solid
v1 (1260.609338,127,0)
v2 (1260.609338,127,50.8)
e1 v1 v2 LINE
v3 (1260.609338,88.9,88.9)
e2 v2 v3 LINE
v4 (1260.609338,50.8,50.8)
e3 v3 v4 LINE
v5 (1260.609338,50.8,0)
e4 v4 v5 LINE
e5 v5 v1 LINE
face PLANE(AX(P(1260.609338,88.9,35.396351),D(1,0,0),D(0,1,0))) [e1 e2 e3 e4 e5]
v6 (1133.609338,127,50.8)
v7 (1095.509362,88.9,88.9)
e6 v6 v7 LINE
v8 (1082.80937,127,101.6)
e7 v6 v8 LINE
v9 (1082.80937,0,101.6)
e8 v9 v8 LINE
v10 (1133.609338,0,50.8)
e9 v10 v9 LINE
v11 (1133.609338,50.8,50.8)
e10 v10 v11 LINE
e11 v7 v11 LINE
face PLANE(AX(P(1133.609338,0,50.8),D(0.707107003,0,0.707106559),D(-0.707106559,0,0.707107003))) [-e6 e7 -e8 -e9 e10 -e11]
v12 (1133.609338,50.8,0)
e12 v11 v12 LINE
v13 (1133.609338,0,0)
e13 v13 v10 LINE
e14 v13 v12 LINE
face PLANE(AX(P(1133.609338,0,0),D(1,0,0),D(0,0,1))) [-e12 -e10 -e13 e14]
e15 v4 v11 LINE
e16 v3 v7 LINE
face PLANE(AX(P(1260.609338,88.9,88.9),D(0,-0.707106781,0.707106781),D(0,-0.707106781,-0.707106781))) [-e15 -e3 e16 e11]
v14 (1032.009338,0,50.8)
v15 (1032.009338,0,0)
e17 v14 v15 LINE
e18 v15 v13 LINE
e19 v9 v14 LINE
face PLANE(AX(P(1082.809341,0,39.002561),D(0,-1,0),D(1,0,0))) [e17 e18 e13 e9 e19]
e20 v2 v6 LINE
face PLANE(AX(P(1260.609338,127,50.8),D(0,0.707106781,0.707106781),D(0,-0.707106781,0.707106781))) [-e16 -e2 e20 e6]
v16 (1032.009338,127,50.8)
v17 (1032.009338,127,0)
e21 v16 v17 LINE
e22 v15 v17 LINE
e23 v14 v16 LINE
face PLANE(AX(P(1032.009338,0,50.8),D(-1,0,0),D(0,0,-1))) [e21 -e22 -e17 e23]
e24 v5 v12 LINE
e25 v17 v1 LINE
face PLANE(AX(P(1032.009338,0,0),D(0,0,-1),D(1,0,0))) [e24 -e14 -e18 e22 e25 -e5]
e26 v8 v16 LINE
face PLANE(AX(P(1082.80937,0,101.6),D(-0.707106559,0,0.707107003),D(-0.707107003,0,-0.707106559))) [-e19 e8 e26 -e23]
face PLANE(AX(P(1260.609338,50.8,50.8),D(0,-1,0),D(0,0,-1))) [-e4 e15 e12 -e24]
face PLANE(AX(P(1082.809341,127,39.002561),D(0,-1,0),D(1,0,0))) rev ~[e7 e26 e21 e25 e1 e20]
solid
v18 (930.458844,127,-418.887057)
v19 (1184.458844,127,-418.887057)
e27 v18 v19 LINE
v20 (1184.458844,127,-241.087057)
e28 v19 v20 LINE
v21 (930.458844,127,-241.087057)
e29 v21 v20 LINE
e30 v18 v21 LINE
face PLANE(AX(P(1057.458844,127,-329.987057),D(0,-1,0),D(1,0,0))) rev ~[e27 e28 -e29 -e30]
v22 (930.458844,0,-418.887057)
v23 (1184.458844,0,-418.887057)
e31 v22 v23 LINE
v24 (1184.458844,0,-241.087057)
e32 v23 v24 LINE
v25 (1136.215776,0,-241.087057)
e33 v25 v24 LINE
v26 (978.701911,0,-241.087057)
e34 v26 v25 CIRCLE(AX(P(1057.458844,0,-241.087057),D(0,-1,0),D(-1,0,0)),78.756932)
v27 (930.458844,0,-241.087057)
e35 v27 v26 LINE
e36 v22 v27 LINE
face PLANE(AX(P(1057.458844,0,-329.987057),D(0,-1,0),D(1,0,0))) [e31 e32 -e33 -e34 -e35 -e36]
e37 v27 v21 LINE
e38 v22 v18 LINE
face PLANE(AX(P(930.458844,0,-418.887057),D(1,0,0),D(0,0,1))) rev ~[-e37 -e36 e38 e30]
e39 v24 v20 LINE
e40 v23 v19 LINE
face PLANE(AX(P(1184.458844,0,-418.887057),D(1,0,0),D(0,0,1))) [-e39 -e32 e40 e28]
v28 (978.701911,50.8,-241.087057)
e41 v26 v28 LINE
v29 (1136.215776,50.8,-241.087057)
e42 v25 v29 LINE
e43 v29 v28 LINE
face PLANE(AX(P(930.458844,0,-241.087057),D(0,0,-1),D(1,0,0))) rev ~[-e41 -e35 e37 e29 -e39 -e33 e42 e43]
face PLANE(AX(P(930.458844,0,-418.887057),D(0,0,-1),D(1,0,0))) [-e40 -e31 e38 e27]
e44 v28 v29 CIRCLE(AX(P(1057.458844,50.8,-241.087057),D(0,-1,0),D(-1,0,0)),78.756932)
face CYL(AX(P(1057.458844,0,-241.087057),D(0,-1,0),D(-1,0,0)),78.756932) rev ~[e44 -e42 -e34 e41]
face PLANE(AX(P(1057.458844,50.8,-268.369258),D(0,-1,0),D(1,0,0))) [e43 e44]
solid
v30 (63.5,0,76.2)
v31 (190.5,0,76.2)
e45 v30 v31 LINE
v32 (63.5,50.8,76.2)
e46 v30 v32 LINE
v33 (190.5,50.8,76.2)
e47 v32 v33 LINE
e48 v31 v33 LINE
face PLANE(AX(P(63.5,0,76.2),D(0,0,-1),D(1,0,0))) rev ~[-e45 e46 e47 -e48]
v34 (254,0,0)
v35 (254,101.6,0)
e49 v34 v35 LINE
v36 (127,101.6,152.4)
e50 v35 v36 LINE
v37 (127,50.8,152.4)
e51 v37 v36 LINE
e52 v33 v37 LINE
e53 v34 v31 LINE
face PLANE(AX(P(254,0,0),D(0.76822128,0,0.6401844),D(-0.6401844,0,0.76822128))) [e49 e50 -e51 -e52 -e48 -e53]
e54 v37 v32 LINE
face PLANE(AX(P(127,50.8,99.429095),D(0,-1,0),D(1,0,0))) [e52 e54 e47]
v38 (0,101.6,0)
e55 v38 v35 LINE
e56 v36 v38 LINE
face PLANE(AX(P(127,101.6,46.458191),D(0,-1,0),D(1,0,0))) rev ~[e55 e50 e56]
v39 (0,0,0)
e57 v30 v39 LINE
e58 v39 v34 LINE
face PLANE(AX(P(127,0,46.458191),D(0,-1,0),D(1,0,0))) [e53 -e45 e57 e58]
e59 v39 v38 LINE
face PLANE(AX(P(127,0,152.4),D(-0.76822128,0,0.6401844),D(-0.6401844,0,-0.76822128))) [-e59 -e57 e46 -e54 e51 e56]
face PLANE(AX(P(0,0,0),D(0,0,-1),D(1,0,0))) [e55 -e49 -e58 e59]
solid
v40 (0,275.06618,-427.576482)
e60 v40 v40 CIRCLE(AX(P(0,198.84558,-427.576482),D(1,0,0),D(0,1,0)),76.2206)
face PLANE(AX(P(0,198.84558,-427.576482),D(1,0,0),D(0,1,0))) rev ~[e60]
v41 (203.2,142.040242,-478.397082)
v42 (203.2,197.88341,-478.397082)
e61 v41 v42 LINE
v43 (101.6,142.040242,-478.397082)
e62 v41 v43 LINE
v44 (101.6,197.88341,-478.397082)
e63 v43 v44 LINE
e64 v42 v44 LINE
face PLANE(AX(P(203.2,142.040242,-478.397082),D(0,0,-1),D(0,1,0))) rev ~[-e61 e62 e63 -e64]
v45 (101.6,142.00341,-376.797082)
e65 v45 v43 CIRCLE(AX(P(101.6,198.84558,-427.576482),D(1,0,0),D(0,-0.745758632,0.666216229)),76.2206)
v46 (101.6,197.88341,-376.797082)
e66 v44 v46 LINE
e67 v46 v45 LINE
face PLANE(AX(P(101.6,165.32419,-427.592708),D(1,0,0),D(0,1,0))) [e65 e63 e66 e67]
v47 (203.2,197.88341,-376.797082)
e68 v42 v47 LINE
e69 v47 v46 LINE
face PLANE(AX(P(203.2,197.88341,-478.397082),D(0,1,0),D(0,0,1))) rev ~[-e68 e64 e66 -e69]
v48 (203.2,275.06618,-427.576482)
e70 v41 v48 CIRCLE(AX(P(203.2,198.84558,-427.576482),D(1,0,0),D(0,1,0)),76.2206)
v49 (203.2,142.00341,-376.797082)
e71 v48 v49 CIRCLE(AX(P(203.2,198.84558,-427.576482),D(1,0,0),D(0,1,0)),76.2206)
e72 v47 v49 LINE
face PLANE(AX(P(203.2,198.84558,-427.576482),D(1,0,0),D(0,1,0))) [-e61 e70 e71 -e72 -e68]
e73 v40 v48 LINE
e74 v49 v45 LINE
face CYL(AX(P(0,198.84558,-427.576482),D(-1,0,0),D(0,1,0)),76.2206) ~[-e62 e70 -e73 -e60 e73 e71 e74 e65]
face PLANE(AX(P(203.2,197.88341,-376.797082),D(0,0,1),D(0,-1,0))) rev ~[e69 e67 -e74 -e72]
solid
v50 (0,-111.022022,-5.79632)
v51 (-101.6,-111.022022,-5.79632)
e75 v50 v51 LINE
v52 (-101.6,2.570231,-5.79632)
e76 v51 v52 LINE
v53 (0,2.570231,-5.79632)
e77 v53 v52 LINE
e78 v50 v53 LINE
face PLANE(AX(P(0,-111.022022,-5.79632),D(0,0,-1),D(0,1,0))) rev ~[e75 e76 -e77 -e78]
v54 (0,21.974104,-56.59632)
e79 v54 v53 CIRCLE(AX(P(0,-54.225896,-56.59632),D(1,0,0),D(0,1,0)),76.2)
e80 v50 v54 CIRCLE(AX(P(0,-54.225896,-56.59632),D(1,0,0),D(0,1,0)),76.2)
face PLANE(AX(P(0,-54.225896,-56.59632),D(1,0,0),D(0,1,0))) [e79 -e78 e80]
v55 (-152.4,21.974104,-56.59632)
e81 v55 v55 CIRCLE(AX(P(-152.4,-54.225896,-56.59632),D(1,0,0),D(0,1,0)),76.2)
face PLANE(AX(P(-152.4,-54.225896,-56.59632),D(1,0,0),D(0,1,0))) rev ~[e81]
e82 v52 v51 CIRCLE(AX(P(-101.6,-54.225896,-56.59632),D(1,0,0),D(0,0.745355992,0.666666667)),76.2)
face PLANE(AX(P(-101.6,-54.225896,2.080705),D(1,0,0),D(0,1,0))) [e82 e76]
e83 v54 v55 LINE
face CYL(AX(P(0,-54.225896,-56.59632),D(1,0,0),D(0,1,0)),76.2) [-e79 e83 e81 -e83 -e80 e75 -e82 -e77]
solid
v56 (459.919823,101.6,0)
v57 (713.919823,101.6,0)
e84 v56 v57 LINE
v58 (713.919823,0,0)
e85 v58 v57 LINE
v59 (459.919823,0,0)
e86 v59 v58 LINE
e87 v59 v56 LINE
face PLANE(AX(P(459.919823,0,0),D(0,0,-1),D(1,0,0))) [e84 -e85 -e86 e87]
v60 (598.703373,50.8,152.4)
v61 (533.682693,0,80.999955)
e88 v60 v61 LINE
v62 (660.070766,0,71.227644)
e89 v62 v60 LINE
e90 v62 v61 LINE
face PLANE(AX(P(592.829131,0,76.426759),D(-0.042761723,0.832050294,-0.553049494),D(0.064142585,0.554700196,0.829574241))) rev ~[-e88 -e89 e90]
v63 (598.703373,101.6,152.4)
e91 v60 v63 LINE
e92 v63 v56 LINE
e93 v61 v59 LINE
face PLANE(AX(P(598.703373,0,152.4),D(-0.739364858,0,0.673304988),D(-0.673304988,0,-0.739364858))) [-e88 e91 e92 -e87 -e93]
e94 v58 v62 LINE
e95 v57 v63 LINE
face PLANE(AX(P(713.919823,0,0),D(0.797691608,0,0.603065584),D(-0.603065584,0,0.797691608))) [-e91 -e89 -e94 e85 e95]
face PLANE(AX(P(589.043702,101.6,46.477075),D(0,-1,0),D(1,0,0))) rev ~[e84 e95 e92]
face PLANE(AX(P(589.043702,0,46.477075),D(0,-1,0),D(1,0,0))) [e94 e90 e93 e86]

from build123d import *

# Parameters (mm, degrees)
F1_DEPTH  = 101.6
F3_DEPTH  = 50.8
F5_DEPTH  = 101.6
F9_DEPTH  = 76.2
F11_DEPTH = 127
F15_R     = 76.2
F16_DEPTH = 152.4
F18_DEPTH = 101.6
F19_R     = 76.2205995961
F20_DEPTH = 203.2
F22_DEPTH = 101.6
F23_W     = 254
F23_H     = 177.8
F24_DEPTH = 127
F26_DEPTH = 50.8


with BuildPart() as f1:
    # F0 (on Front) → F1 (new body)
    with BuildSketch(Plane.XZ):
        Polygon((127, 152.4), (0, 0), (254, 0), align=None)
    extrude(amount=-F1_DEPTH)

    # F2 (on face) → F3 (cut)
    with BuildSketch(Plane.XZ):
        Polygon((127, 152.4), (63.5, 76.2), (190.5, 76.2), align=None)
    extrude(amount=-F3_DEPTH, mode=Mode.SUBTRACT)


with BuildPart() as f5:
    # F4 (on Front) → F5 (new body)
    with BuildSketch(Plane.XZ):
        Polygon((598.7033731911, 152.4), (459.9198227574, 0), (713.9198227574, 0), align=None)
    extrude(amount=-F5_DEPTH)

    # F8 (on 3pt) → F9 (cut, symmetric)
    with BuildSketch(Plane(origin=(583.4318544266, 0, -45.1108837356), x_dir=(0, 1, 0), z_dir=(0.9970241541, 0, -0.0770897927))):
        Polygon((50.8, 198.100399998), (0, 198.100399998), (0, 121.900399998), align=None)
    extrude(amount=F9_DEPTH, both=True, mode=Mode.SUBTRACT)


with BuildPart() as f11:
    # F10 (on Front) → F11 (new body)
    with BuildSketch(Plane.XZ):
        Polygon((1032.0093378178, 50.8), (1032.0093378178, 0), (1133.6093378178, 0), (1133.6093378178, 50.8), (1082.8093697124, 101.6), align=None)
    extrude(amount=-F11_DEPTH)

    # F13 (on offset) → F14 (join, up to the next surface of F11)
    with BuildSketch(Plane.YZ.offset(1260.6093378178)):
        Polygon((50.8, 0), (127, 0), (127, 50.8), (88.9, 88.9), (50.8, 50.8), align=None)
    extrude(until=Until.NEXT, dir=(-1, 0, 0))


with BuildPart() as f16:
    # F15 (on Right) → F16 (new body)
    with BuildSketch(Plane.YZ):
        with Locations((-54.2258955538, -56.5963201225)):
            Circle(F15_R)
    extrude(amount=-F16_DEPTH)

    # F17 (on face) → F18 (cut)
    with BuildSketch(Plane.YZ):
        with BuildLine():
            ThreePointArc((2.5702310747, -5.7963201225), (-54.2258955538, 19.6036798775), (-111.0220221823, -5.7963201225))
            Line((-111.0220221823, -5.7963201225), (2.5702310747, -5.7963201225))
        make_face()
    extrude(amount=-F18_DEPTH, mode=Mode.SUBTRACT)


with BuildPart() as f20:
    # F19 (on Right) → F20 (new body)
    with BuildSketch(Plane.YZ):
        with Locations((198.8455802202, -427.576482296)):
            Circle(F19_R)
    extrude(amount=F20_DEPTH)

    # F21 (on face) → F22 (cut)
    with BuildSketch(Plane.YZ.offset(203.2)):
        with BuildLine():
            Line((197.8834101577, -376.7970818921), (142.0034101577, -376.7970818921))
            ThreePointArc((142.0034101577, -376.7970818921), (122.6249856325, -427.6041135831), (142.0402419193, -478.3970818921))
            Line((142.0402419193, -478.3970818921), (197.8834101577, -478.3970818921))
            Line((197.8834101577, -478.3970818921), (197.8834101577, -376.7970818921))
        make_face()
    extrude(amount=-F22_DEPTH, mode=Mode.SUBTRACT)


with BuildPart() as f24:
    # F23 (on Front) → F24 (new body)
    with BuildSketch(Plane.XZ):
        with Locations((1057.4588435119, -329.9870565534)):
            Rectangle(F23_W, F23_H)
    extrude(amount=-F24_DEPTH)

    # F25 (on face) → F26 (cut)
    with BuildSketch(Plane.XZ):
        with BuildLine():
            ThreePointArc((978.7019110825, -241.0870565534), (1057.4588435119, -319.8439889828), (1136.2157759414, -241.0870565534))
            Line((1136.2157759414, -241.0870565534), (978.7019110825, -241.0870565534))
        make_face()
    extrude(amount=-F26_DEPTH, mode=Mode.SUBTRACT)


solid = Compound([f1.part, f5.part, f11.part, f16.part, f20.part, f24.part])
